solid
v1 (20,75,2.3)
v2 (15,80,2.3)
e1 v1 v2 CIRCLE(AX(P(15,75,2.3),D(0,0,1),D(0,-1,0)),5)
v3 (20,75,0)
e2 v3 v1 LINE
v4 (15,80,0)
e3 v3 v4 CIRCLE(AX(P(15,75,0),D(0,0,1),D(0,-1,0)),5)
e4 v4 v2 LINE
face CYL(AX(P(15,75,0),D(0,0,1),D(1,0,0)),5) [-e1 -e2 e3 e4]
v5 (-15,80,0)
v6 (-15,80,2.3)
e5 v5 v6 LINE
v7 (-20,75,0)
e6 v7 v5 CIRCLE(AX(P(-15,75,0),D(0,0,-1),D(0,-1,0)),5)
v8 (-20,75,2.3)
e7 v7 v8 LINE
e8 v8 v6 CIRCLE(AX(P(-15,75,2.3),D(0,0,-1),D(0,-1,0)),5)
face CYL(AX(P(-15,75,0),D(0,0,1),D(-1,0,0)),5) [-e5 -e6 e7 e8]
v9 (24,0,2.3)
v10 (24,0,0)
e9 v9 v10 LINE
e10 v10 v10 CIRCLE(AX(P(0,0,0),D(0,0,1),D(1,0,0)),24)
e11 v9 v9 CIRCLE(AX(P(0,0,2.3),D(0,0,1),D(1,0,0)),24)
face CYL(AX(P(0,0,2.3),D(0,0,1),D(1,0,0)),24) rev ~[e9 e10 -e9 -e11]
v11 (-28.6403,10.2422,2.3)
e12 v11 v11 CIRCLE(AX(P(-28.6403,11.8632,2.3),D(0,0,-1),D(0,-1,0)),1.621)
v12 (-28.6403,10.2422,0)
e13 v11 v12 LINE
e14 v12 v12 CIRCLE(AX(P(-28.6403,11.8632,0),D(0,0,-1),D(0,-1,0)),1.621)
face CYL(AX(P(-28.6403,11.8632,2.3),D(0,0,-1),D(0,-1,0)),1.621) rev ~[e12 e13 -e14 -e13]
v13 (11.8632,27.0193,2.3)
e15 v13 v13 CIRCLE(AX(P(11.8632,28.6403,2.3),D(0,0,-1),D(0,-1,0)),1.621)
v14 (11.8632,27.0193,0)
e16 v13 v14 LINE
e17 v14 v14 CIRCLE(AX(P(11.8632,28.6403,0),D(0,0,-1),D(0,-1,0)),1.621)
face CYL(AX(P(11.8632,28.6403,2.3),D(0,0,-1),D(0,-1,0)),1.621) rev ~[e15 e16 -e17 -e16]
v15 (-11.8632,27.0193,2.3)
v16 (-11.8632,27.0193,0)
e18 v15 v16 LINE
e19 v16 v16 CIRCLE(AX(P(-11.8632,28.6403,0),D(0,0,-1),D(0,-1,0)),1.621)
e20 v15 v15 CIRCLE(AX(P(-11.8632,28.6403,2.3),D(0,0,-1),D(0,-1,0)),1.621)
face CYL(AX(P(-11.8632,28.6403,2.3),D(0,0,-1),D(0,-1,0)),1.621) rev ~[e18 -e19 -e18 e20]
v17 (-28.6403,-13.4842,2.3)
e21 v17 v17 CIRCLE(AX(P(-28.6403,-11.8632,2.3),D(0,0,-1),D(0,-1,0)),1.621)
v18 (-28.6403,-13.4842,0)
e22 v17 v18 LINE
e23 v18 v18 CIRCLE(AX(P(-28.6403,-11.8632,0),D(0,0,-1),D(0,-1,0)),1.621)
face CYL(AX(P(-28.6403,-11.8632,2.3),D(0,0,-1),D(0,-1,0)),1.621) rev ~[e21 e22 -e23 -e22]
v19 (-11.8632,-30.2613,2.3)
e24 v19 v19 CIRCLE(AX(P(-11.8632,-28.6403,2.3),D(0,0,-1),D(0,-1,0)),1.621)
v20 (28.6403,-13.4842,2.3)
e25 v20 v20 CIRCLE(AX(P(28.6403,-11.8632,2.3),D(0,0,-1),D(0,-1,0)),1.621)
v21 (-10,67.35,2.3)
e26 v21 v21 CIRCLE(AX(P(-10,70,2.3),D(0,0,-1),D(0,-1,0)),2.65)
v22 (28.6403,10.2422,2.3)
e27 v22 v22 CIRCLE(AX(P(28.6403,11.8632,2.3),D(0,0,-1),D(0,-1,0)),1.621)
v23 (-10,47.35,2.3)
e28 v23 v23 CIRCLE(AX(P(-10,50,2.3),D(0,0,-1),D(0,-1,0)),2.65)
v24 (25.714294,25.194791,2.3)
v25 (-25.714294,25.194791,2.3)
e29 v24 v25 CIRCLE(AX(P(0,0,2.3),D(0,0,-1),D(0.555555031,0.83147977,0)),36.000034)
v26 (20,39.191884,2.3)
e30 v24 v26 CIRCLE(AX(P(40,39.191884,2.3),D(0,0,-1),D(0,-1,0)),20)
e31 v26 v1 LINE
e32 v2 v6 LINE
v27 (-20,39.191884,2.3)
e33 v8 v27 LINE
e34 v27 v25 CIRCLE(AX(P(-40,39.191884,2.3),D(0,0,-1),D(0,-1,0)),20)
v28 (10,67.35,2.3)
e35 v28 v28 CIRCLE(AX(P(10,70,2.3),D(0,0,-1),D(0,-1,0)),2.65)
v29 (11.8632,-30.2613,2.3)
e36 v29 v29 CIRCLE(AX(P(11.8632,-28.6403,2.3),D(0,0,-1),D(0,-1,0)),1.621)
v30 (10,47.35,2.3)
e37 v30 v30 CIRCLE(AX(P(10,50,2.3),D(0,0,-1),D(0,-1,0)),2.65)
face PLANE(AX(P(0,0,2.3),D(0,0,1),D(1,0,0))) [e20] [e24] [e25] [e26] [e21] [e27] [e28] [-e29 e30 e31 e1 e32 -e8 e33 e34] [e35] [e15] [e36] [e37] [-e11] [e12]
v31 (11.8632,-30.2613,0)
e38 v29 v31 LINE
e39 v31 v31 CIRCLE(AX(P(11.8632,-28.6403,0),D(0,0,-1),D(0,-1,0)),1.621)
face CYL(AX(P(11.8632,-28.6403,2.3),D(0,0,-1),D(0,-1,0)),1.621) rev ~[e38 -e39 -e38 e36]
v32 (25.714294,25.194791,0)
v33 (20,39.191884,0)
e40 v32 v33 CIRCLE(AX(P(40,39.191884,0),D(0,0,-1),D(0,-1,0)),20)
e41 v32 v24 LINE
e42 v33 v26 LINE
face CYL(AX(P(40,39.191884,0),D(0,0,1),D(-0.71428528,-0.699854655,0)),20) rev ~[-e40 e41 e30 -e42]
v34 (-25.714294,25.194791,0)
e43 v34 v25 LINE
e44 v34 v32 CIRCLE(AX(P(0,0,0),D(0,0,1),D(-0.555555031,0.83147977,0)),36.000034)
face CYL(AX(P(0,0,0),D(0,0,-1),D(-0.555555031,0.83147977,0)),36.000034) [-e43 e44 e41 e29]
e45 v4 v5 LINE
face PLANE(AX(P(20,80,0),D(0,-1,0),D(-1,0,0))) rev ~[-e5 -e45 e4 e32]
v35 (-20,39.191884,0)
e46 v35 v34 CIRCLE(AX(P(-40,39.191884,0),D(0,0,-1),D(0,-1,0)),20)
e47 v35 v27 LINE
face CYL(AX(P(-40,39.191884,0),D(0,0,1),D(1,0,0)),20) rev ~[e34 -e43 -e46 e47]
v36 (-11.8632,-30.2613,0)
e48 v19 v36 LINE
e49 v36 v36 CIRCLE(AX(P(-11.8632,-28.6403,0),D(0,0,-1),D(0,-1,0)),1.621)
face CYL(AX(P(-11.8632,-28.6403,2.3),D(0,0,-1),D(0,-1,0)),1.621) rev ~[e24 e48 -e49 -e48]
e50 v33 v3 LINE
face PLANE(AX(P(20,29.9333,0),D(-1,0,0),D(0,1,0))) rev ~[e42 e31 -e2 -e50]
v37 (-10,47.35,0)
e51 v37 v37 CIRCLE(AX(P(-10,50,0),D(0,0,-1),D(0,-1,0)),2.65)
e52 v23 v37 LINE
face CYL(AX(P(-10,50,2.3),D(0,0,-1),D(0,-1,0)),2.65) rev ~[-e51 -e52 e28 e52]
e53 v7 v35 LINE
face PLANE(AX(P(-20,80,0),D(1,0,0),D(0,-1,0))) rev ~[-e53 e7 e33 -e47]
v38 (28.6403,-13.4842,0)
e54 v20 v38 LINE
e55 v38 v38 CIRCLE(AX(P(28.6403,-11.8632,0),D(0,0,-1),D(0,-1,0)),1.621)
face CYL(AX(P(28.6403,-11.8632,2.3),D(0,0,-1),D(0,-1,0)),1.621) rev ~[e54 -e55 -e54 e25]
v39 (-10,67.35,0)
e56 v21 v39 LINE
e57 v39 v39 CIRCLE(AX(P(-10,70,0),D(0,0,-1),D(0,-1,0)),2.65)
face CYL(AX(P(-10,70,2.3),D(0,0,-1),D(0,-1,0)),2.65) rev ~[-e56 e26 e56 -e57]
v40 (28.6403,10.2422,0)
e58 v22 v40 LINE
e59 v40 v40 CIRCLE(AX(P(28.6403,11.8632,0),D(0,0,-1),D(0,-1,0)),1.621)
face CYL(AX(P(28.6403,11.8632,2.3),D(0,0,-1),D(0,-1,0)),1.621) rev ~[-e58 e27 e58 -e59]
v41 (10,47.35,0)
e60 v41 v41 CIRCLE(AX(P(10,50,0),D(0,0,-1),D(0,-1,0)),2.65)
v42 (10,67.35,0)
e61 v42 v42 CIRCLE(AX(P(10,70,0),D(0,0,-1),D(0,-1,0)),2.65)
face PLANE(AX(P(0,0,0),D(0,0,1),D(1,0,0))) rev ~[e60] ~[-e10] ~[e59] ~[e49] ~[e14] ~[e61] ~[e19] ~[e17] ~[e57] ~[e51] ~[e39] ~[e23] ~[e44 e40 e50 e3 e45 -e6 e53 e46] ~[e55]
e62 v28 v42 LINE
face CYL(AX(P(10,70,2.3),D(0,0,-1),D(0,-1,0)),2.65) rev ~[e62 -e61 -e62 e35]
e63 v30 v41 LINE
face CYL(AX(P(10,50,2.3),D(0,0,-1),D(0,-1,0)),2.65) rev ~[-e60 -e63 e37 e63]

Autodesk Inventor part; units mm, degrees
ref_plane "YZ Plane" through (0, 0, 0) normal (1, 0, 0) x (0, 1, 0)
ref_plane "XZ Plane" through (0, 0, 0) normal (0, 1, 0) x (-1, 0, 0)
ref_plane "XY Plane" through (0, 0, 0) normal (0, 0, 1) x (1, 0, 0)
sketch "スケッチ1" plane through (0, 0, 0) normal (0, 0, 1) x (1, 0, 0)
  arc A0 (-20, 29.9333) -> (20, 29.9333) centre (0, 0) ccw
  line L0 (-20, -80) -> (20, -80)
  line L1 (20, -80) -> (20, 80)
  line L2 (20, 80) -> (-20, 80)
  line L3 (-20, 80) -> (-20, -80)
  line L4 (-20, -80) -> (20, 80) construction
  line L5 (20, -80) -> (-20, 80) construction
  dimension "d0" = 72
  dimension "d1" = 80
  dimension "d2" = 40
extrude "プレート1" add sketch "スケッチ1" along normal blind 2.3 contours L3 A0 | L3 L2 L1 A0 | L1 A0
sketch "スケッチ2" plane through (0, 0, 2.3) normal (0, 0, 1) x (1, 0, 0)
  circle A0 centre (0, 0) radius 31
  point P0 (-28.6403, -11.8632)
  point P1 (-11.8632, -28.6403)
  point P2 (11.8632, -28.6403)
  point P3 (28.6403, -11.8632)
  point P4 (28.6403, 11.8632)
  point P5 (11.8632, 28.6403)
  point P6 (-11.8632, 28.6403)
  point P7 (-28.6403, 11.8632)
  dimension "d5" = 62
  dimension "d8" = 360
  dimension "d34" = 0
hole "穴1" at (-28.6403, 11.8632, 2.3) at (-11.8632, 28.6403, 2.3) at (11.8632, 28.6403, 2.3) at (28.6403, 11.8632, 2.3) at (28.6403, -11.8632, 2.3) at (11.8632, -28.6403, 2.3) at (-11.8632, -28.6403, 2.3) at (-28.6403, -11.8632, 2.3) direction (0, 0, -1) diameter 3.242 end through all thread size "M4x0.7" class "6H" standard "ANSI Metric M Profile"
sketch "スケッチ4" plane through (0, 0, 2.3) normal (0, 0, 1) x (1, 0, 0)
  line L0 (10, 50) -> (-10, 50)
  line L1 (-10, 50) -> (-10, 70)
  line L2 (-10, 70) -> (10, 70)
  line L3 (10, 70) -> (10, 50)
  line L4 (10, 50) -> (-10, 70) construction
  line L5 (-10, 50) -> (10, 70) construction
  line L6 (-20, 80) -> (20, 80) projected
  circle A0 centre (0, 0) radius 72.5
  point P0 (0, 60)
  point P1 (0, 60)
  dimension "d21" = 20
  dimension "d22" = 10
  dimension "d33" = 145
  dimension "d38" = 20
hole "穴2" at (-10, 70, 2.3) at (10, 70, 2.3) at (-10, 50, 2.3) at (10, 50, 2.3) direction (0, 0, -1) diameter 5.3 end through all clearance for "Socket Head Cap Screw" size "M5" standard "Ansi Metric M Profile"
fillet "コーナーR2" radius 5 2 edges at (-20, 80, 1.15) (20, 80, 1.15)
sketch "スケッチ5" plane through (0, 0, 2.3) normal (0, 0, 1) x (1, 0, 0)
  circle A0 centre (0, 0) radius 24
  dimension "d35" = 48
extrude "押し出し2" cut sketch "スケッチ5" against normal blind 10
fillet "コーナーR3" radius 20 2 edges at (20, 29.9333, 1.15) (-20, 29.9333, 1.15)
equation "\"d16\" = Thickness"
equation "\"d3\" = Thickness"
equation "\"BendRadius\" = Thickness"
equation "\"BendReliefWidth\" = Thickness"
equation "\"BendReliefDepth\" = 0.5 * Thickness"
equation "\"CornerReliefSize\" = 4 * Thickness"
equation "\"MinimumRemnant\" = 2 * Thickness"
equation "\"TransitionRadius\" = BendRadius"
equation "\"JacobiRadiusSize\" = BendRadius"
equation "\"GapSize\" = Thickness"
equation "\"Thickness\" = 2.3"
properties part number "scara-plate9" material "鋼、炭素鋼"
